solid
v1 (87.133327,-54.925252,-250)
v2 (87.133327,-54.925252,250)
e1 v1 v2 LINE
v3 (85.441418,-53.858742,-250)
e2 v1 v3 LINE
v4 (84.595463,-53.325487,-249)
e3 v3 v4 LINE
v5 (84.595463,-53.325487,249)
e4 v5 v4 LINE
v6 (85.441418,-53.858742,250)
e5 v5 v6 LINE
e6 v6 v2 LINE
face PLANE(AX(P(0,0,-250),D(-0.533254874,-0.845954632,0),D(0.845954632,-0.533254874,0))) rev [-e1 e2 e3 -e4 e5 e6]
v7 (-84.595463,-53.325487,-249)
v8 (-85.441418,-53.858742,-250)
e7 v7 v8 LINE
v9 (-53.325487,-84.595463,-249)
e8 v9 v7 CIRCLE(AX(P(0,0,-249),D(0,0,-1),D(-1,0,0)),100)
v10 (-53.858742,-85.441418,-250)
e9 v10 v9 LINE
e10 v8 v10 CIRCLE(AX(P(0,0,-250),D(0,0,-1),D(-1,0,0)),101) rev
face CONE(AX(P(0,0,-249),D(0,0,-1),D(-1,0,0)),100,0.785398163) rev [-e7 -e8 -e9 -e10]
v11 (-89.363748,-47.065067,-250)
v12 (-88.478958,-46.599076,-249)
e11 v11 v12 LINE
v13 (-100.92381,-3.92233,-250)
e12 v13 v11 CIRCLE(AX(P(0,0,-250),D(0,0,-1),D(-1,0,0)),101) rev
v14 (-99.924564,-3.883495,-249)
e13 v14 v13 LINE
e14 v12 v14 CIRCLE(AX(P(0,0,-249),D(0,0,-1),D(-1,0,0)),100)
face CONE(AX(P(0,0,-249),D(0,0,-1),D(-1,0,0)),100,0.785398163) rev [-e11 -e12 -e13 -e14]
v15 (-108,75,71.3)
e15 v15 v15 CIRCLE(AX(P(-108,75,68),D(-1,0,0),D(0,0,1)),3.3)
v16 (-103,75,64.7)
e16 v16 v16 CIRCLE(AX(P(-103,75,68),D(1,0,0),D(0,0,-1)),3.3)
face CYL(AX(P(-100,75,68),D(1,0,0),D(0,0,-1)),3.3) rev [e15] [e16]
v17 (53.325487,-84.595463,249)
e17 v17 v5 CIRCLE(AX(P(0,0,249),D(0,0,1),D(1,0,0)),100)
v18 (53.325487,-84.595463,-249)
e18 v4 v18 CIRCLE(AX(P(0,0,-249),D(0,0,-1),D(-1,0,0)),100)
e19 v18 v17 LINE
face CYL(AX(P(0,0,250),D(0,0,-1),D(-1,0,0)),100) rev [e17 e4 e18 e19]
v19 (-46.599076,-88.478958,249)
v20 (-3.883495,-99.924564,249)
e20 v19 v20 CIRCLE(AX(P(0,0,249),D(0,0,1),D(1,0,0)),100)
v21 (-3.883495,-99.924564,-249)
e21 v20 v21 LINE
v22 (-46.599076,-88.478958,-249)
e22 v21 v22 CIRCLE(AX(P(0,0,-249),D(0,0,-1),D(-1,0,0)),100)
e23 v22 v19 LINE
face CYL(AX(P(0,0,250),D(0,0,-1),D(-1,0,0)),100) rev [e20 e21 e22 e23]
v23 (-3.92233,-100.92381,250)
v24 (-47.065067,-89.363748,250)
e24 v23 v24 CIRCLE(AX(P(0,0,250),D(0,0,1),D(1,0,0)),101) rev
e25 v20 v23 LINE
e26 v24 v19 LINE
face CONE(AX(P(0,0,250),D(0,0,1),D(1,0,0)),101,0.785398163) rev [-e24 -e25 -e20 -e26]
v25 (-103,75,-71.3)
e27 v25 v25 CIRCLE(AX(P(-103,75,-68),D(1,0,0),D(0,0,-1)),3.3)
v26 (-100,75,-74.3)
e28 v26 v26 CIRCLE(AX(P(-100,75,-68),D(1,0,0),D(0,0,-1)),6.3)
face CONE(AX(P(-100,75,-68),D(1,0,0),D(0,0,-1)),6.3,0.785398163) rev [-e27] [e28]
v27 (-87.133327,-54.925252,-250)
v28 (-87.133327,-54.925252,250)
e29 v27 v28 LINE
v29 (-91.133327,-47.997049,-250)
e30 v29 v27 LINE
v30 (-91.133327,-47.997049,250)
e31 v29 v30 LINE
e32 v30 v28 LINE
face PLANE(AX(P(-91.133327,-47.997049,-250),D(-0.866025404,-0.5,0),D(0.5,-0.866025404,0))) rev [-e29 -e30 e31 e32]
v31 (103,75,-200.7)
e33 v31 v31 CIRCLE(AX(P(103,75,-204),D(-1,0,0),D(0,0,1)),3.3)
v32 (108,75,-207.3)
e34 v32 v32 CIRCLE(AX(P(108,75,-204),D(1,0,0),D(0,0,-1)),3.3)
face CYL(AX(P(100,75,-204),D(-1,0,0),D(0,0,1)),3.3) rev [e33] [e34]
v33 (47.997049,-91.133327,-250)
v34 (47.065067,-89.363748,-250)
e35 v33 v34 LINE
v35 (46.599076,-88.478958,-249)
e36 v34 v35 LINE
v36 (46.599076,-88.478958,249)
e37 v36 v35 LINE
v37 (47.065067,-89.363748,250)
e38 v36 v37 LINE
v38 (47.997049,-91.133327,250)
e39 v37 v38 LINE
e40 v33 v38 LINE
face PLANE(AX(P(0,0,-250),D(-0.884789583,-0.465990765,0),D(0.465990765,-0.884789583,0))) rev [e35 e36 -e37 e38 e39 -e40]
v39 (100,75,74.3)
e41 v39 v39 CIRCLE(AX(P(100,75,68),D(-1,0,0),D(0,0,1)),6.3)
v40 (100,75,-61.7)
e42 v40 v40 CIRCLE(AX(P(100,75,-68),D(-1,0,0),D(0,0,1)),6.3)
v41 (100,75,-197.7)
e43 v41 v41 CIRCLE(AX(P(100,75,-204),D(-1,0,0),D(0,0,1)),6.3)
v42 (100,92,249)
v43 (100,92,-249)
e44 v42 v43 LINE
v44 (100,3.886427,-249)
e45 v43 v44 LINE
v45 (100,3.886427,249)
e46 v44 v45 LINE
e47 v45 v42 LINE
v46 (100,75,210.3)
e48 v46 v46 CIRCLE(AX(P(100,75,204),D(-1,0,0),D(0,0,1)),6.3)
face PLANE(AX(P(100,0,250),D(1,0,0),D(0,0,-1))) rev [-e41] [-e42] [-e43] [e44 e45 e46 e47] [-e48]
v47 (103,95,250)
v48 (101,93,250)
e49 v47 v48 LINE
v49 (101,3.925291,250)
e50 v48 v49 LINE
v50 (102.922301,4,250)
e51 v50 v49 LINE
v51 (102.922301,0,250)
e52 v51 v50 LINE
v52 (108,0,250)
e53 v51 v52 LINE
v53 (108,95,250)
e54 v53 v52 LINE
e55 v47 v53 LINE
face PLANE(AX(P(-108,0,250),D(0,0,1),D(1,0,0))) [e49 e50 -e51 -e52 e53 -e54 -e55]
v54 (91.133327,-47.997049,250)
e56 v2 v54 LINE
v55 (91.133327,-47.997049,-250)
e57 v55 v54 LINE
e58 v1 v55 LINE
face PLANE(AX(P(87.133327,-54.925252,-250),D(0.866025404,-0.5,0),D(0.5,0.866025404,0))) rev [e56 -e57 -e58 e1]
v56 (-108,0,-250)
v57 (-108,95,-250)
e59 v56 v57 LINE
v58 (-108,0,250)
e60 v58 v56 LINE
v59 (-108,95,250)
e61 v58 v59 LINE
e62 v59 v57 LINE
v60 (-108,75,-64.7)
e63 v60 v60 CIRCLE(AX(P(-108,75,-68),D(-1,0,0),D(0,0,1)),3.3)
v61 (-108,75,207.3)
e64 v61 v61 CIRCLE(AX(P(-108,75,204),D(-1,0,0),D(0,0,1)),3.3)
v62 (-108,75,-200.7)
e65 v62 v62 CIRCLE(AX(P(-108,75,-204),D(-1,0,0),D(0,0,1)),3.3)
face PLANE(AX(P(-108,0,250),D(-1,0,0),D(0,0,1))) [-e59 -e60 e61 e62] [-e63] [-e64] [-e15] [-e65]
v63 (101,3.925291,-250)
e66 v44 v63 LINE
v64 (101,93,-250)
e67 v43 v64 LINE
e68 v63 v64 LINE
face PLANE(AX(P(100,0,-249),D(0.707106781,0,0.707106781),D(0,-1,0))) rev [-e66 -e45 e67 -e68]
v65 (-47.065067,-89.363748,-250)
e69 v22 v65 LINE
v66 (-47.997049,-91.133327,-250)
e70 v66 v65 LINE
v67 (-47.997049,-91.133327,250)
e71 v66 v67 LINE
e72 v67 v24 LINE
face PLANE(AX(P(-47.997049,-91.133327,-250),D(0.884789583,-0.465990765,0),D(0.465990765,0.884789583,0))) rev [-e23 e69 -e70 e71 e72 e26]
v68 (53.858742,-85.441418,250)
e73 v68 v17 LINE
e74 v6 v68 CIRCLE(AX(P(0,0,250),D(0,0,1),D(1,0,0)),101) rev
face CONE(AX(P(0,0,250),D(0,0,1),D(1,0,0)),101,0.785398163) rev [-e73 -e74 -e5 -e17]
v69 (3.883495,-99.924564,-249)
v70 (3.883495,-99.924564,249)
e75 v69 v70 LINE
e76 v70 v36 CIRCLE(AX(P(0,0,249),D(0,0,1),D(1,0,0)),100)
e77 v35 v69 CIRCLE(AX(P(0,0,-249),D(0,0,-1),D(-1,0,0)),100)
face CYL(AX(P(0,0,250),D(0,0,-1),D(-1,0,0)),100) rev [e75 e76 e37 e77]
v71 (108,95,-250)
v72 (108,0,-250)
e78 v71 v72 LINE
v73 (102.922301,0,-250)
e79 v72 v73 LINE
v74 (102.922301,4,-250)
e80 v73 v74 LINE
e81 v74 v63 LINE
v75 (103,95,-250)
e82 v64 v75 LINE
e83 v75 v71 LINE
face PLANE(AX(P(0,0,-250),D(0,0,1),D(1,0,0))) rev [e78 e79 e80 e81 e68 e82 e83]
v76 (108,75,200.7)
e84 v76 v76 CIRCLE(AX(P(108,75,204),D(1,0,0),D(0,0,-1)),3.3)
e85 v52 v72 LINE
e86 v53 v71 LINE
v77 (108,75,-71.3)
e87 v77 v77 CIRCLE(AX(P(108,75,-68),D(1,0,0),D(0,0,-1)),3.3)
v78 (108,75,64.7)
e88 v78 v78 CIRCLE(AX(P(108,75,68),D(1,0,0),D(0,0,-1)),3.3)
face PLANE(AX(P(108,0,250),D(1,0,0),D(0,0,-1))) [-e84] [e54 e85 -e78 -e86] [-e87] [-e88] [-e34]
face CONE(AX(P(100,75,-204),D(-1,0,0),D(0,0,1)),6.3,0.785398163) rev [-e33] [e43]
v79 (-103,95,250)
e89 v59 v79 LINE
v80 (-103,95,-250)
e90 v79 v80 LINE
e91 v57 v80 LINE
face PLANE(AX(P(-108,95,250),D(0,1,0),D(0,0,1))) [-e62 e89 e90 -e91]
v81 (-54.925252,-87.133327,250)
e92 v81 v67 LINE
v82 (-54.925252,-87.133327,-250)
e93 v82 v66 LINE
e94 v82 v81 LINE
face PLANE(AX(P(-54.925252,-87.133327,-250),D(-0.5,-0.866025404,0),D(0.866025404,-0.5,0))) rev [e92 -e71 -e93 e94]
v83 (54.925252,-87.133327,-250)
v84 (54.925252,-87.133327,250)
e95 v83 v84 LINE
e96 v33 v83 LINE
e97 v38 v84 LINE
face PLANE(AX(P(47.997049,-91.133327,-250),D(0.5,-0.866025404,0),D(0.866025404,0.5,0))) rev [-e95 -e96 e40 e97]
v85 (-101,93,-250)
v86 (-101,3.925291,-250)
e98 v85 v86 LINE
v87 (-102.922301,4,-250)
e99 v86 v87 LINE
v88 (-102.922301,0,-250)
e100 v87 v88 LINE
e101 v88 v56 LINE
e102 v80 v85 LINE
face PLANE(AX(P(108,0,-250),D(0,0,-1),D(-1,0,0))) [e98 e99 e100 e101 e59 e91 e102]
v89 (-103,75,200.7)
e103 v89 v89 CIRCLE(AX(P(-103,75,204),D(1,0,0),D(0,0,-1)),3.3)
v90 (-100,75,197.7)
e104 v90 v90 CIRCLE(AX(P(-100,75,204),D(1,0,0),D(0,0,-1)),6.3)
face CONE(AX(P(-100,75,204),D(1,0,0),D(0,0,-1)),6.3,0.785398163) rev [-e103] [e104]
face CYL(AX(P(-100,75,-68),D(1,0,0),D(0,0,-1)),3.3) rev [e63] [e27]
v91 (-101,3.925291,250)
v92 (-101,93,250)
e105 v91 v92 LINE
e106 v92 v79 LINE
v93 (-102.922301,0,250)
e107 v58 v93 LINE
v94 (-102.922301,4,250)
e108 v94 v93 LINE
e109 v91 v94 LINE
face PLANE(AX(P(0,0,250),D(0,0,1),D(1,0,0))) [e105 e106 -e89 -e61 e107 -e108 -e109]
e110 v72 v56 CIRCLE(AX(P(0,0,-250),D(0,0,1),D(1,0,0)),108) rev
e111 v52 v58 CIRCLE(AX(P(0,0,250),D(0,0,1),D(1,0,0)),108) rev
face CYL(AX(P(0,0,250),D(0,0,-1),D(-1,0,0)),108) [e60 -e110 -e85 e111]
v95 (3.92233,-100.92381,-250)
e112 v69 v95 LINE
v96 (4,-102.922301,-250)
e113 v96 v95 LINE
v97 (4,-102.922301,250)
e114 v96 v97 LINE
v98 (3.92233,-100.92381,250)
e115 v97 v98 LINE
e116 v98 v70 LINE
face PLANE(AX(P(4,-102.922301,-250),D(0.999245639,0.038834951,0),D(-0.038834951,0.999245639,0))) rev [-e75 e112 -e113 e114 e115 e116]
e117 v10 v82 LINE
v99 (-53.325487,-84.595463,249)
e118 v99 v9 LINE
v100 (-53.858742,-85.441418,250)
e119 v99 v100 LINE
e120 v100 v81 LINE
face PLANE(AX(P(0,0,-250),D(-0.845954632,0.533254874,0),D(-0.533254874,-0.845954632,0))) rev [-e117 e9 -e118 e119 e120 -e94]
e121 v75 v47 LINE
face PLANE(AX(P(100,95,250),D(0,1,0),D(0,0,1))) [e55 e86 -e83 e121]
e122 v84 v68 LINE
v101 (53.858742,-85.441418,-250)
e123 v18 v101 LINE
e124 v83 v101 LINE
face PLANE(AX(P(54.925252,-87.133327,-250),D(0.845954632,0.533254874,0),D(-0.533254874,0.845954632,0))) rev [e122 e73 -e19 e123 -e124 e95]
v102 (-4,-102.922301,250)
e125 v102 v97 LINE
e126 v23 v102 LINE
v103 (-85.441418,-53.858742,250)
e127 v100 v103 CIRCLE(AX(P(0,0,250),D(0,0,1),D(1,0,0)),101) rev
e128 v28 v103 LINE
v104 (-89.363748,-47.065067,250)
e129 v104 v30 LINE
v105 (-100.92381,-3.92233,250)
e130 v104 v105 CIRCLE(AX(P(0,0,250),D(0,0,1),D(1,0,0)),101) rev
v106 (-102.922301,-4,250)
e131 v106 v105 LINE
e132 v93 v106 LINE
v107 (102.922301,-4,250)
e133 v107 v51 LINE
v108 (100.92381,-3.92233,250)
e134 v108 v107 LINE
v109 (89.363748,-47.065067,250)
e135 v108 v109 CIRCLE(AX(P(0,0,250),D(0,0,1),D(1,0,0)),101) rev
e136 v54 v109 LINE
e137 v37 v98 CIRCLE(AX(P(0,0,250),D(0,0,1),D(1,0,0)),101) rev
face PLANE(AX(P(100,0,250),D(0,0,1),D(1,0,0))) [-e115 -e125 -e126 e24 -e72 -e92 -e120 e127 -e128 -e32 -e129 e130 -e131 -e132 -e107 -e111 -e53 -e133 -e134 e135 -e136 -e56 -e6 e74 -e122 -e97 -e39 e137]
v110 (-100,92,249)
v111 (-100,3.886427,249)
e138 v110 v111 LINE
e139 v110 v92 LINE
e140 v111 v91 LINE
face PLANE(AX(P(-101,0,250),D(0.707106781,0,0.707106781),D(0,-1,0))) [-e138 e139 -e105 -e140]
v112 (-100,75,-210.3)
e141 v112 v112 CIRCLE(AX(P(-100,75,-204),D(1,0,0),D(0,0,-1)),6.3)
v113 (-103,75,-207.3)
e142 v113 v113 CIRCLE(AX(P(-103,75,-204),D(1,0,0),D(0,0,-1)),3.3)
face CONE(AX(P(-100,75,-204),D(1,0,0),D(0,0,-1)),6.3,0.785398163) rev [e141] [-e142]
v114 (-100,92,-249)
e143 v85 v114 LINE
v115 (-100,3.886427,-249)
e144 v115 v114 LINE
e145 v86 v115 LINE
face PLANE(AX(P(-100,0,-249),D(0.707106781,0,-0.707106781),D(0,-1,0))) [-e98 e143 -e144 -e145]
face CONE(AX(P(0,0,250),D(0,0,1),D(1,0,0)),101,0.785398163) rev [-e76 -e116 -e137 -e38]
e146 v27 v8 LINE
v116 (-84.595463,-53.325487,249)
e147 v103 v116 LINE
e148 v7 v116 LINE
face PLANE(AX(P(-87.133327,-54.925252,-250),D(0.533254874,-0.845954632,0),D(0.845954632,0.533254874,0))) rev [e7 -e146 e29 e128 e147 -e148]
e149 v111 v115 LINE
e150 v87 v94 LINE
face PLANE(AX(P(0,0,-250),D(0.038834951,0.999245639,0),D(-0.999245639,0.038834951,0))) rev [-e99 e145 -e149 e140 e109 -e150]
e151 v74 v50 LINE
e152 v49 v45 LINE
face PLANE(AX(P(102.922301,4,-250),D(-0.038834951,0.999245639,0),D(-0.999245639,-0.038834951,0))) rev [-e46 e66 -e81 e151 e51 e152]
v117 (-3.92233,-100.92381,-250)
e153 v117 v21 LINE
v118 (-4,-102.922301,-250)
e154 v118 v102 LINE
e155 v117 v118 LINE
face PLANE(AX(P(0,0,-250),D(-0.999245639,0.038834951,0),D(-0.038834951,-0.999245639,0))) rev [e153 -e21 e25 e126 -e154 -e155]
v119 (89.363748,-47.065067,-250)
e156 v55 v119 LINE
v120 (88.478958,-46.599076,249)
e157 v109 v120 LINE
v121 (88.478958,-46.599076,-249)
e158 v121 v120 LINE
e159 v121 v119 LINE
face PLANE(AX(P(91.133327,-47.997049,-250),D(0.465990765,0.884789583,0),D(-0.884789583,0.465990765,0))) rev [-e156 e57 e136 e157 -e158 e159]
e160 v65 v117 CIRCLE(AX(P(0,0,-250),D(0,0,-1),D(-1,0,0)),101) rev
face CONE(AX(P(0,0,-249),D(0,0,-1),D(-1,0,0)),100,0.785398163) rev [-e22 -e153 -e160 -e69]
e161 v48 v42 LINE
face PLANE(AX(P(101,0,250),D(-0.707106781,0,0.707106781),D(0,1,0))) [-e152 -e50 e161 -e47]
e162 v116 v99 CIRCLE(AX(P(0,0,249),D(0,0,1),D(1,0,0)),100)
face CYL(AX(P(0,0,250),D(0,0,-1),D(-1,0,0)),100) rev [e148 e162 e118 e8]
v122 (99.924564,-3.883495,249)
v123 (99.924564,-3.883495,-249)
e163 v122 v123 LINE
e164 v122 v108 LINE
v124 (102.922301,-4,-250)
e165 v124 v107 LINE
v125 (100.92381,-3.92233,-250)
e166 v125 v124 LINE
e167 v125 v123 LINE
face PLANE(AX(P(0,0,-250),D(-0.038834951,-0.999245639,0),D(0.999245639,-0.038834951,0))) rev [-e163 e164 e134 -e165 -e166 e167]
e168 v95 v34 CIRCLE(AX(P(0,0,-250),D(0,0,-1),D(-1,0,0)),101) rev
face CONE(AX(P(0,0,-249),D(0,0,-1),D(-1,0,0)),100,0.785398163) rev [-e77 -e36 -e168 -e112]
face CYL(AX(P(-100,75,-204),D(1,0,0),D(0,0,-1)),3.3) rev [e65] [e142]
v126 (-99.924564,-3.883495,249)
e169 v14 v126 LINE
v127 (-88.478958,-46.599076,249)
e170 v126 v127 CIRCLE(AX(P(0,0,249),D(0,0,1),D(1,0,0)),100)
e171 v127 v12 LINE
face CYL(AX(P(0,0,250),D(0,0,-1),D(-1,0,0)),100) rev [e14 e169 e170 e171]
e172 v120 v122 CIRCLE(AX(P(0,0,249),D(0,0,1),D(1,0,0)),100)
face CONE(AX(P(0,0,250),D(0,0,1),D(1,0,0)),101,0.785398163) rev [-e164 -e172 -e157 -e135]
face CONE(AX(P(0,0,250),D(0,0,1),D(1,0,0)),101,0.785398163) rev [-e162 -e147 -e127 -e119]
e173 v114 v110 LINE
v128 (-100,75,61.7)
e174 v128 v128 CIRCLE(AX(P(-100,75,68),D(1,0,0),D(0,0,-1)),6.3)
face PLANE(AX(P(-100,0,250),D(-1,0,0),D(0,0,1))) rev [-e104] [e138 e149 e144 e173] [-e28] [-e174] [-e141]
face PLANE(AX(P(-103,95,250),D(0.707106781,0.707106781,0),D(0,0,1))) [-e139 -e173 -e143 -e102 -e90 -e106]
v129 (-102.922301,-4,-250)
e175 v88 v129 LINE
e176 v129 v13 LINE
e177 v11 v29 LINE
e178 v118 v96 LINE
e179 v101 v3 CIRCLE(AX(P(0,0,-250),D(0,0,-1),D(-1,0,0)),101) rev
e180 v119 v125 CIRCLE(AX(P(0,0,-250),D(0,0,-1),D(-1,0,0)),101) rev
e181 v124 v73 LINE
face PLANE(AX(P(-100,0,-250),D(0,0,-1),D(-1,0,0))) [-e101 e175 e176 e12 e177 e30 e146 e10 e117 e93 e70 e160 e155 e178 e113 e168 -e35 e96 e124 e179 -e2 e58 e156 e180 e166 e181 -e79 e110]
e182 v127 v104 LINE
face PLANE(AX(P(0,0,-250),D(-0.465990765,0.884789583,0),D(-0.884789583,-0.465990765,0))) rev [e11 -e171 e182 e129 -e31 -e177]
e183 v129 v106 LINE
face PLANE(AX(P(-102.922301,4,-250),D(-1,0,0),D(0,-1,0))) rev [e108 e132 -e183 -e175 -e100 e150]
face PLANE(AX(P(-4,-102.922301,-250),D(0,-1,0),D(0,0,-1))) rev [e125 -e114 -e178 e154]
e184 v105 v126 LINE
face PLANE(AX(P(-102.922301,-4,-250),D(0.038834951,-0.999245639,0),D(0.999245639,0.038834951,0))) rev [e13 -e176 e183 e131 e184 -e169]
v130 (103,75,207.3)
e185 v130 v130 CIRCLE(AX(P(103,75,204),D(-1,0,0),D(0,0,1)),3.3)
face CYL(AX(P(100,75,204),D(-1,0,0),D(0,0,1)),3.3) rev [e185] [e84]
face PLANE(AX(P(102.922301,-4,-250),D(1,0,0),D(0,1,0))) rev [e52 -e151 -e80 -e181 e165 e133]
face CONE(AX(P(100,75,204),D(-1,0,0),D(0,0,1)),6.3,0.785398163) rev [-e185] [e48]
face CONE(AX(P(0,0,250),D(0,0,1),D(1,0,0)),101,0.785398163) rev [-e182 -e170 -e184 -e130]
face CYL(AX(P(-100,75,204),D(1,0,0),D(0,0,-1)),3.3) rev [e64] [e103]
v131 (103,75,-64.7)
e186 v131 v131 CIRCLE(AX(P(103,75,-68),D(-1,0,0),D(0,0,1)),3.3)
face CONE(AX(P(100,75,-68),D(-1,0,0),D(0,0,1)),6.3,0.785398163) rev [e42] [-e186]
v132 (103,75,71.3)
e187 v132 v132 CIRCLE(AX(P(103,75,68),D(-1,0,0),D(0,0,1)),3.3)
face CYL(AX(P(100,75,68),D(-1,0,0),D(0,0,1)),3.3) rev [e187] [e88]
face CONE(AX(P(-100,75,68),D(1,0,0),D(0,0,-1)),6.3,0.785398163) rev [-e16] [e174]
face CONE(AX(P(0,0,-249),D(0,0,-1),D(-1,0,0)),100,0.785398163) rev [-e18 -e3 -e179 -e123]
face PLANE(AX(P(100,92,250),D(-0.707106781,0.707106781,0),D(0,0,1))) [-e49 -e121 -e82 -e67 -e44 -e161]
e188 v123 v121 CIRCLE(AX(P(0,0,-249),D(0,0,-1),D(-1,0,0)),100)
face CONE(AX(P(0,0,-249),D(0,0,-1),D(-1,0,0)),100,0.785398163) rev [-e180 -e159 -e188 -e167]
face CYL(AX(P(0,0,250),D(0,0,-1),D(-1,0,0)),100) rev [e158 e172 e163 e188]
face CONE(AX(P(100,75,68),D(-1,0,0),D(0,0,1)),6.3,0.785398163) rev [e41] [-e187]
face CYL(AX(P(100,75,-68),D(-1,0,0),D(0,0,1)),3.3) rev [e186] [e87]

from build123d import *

# Parameters (mm, degrees)
SM_BASE_FLANGE_1_DEPTH     = 250
CHAMFER_2_SIZE             = 1
CUT_EXTRUDE_1_DEPTH        = 523.807804073
PATTERN_CIRCULAR_1_COUNT   = 4
PATTERN_CIRCULAR_1_ANGLE   = 90
F_1_THE_OTHER_WAY_COUNT    = 4
F_1_THE_OTHER_WAY_ANGLE    = 90
CHAMFER_1_SIZE             = 3
HOLE_WIZARD_M61_AT_2_COUNT = 2
HOLE_WIZARD_M61_AT_2_PITCH = 136
HOLE_WIZARD_M61_AT_3_COUNT = 2
HOLE_WIZARD_M61_AT_3_PITCH = 272
HOLE_WIZARD_M61_AT_4_COUNT = 2
HOLE_WIZARD_M61_AT_4_PITCH = 408


# Sheet-metal steps are written as plain solids
with BuildPart() as part:
    # Sketch 2 → Базовая кромка1 (new, symmetric)
    with BuildSketch(Plane.XY):
        with BuildLine():
            Line((100, 95), (100, 0))
            ThreePointArc((100, 0), (0, -100), (-100, 0))
            Line((-100, 0), (-100, 95))
            Line((-100, 95), (-108, 95))
            Line((-108, 95), (-108, 0))
            ThreePointArc((-108, 0), (0, -108), (108, 0))
            Line((108, 0), (108, 95))
            Line((108, 95), (100, 95))
        make_face()
    extrude(amount=SM_BASE_FLANGE_1_DEPTH, both=True)

    # Фаска2
    chamfer_2_edges = [part.edges().sort_by_distance(p)[0] for p in [
        (100, 47.5, 250),
        (0, -100, 250),
        (-100, 47.5, 250),
        (0, -100, -250),
        (100, 47.5, -250),
        (-100, 47.5, -250),
    ]]
    chamfer(chamfer_2_edges, length=CHAMFER_2_SIZE)

    # Эскиз7 → Вырез-Вытянуть1 (cut, symmetric)
    with BuildSketch(Plane.XY.offset(250)):
        Polygon((0, 0), (-4, -102.92230079), (4, -102.92230079), align=None)
    cut_extrude_1 = extrude(amount=CUT_EXTRUDE_1_DEPTH, both=True, mode=Mode.SUBTRACT)

    # Круговой массив1: Вырез-Вытянуть1 ×4 about axis
    pattern_circular_1_axis = Axis((0, 0, 0), (0, 0, -1))
    for i in range(1, PATTERN_CIRCULAR_1_COUNT):
        add(cut_extrude_1.rotate(pattern_circular_1_axis, i * PATTERN_CIRCULAR_1_ANGLE / (PATTERN_CIRCULAR_1_COUNT - 1)), mode=Mode.SUBTRACT)

    # 1 the other way: Вырез-Вытянуть1 ×4 about axis
    f_1_the_other_way_axis = Axis((0, 0, 0), (0, 0, 1))
    for i in range(1, F_1_THE_OTHER_WAY_COUNT):
        add(cut_extrude_1.rotate(f_1_the_other_way_axis, i * F_1_THE_OTHER_WAY_ANGLE / (F_1_THE_OTHER_WAY_COUNT - 1)), mode=Mode.SUBTRACT)

    # Фаска1
    chamfer_1_edges = [part.edges().sort_by_distance(p)[0] for p in [
        (100, 95, 0),
        (-100, 95, 0),
    ]]
    chamfer(chamfer_1_edges, length=CHAMFER_1_SIZE)

    # Эскиз9 → Зенковка для винта с полупотайной головкой M61 (revolve, cut)
    with BuildSketch(Plane(origin=(-100, 75, 204), x_dir=(0, 0, -1), z_dir=(0, 1, 0))):
        Polygon((0, 0), (0, 18.982840043), (3.3, 17), (3.3, 3), (6.3, 0), align=None)
    hole_wizard_m61 = revolve(axis=Axis((-93.65, 75, 204), (-1, 0, 0)), mode=Mode.SUBTRACT)

    # Зенковка для винта с полупотайной головкой M61 at 2: Зенковка для винта с полупотайной головкой M61 ×2
    with Locations(*[(0, 0, -i * HOLE_WIZARD_M61_AT_2_PITCH) for i in range(1, HOLE_WIZARD_M61_AT_2_COUNT)]):
        add(hole_wizard_m61, mode=Mode.SUBTRACT)

    # Зенковка для винта с полупотайной головкой M61 at 3: Зенковка для винта с полупотайной головкой M61 ×2
    with Locations(*[(0, 0, -i * HOLE_WIZARD_M61_AT_3_PITCH) for i in range(1, HOLE_WIZARD_M61_AT_3_COUNT)]):
        add(hole_wizard_m61, mode=Mode.SUBTRACT)

    # Зенковка для винта с полупотайной головкой M61 at 4: Зенковка для винта с полупотайной головкой M61 ×2
    with Locations(*[(0, 0, -i * HOLE_WIZARD_M61_AT_4_PITCH) for i in range(1, HOLE_WIZARD_M61_AT_4_COUNT)]):
        add(hole_wizard_m61, mode=Mode.SUBTRACT)

    # Зеркальное отражение1: Зенковка для винта с полупотайной головкой M61 across plane
    add(hole_wizard_m61.mirror(Plane(origin=(0, 0, 0), x_dir=(0, 0, 1), z_dir=(1, 0, 0))), mode=Mode.SUBTRACT)

    # Зеркальное отражение1 copy 1 sketch → Зеркальное отражение1 copy 1 (revolve, cut)
    with BuildSketch(Plane(origin=(100, 75, 68), x_dir=(0, 0, -1), z_dir=(0, 1, 0))):
        Polygon((0, 0), (0, -18.982840043), (3.3, -17), (3.3, -3), (6.3, 0), align=None)
    revolve(axis=Axis((93.65, 75, 68), (-1, 0, 0)), mode=Mode.SUBTRACT)

    # Зеркальное отражение1 copy 2 sketch → Зеркальное отражение1 copy 2 (revolve, cut)
    with BuildSketch(Plane(origin=(100, 75, -68), x_dir=(0, 0, -1), z_dir=(0, 1, 0))):
        Polygon((0, 0), (0, -18.982840043), (3.3, -17), (3.3, -3), (6.3, 0), align=None)
    revolve(axis=Axis((93.65, 75, -68), (-1, 0, 0)), mode=Mode.SUBTRACT)

    # Зеркальное отражение1 copy 3 sketch → Зеркальное отражение1 copy 3 (revolve, cut)
    with BuildSketch(Plane(origin=(100, 75, -204), x_dir=(0, 0, -1), z_dir=(0, 1, 0))):
        Polygon((0, 0), (0, -18.982840043), (3.3, -17), (3.3, -3), (6.3, 0), align=None)
    revolve(axis=Axis((93.65, 75, -204), (-1, 0, 0)), mode=Mode.SUBTRACT)


solid = part.part
